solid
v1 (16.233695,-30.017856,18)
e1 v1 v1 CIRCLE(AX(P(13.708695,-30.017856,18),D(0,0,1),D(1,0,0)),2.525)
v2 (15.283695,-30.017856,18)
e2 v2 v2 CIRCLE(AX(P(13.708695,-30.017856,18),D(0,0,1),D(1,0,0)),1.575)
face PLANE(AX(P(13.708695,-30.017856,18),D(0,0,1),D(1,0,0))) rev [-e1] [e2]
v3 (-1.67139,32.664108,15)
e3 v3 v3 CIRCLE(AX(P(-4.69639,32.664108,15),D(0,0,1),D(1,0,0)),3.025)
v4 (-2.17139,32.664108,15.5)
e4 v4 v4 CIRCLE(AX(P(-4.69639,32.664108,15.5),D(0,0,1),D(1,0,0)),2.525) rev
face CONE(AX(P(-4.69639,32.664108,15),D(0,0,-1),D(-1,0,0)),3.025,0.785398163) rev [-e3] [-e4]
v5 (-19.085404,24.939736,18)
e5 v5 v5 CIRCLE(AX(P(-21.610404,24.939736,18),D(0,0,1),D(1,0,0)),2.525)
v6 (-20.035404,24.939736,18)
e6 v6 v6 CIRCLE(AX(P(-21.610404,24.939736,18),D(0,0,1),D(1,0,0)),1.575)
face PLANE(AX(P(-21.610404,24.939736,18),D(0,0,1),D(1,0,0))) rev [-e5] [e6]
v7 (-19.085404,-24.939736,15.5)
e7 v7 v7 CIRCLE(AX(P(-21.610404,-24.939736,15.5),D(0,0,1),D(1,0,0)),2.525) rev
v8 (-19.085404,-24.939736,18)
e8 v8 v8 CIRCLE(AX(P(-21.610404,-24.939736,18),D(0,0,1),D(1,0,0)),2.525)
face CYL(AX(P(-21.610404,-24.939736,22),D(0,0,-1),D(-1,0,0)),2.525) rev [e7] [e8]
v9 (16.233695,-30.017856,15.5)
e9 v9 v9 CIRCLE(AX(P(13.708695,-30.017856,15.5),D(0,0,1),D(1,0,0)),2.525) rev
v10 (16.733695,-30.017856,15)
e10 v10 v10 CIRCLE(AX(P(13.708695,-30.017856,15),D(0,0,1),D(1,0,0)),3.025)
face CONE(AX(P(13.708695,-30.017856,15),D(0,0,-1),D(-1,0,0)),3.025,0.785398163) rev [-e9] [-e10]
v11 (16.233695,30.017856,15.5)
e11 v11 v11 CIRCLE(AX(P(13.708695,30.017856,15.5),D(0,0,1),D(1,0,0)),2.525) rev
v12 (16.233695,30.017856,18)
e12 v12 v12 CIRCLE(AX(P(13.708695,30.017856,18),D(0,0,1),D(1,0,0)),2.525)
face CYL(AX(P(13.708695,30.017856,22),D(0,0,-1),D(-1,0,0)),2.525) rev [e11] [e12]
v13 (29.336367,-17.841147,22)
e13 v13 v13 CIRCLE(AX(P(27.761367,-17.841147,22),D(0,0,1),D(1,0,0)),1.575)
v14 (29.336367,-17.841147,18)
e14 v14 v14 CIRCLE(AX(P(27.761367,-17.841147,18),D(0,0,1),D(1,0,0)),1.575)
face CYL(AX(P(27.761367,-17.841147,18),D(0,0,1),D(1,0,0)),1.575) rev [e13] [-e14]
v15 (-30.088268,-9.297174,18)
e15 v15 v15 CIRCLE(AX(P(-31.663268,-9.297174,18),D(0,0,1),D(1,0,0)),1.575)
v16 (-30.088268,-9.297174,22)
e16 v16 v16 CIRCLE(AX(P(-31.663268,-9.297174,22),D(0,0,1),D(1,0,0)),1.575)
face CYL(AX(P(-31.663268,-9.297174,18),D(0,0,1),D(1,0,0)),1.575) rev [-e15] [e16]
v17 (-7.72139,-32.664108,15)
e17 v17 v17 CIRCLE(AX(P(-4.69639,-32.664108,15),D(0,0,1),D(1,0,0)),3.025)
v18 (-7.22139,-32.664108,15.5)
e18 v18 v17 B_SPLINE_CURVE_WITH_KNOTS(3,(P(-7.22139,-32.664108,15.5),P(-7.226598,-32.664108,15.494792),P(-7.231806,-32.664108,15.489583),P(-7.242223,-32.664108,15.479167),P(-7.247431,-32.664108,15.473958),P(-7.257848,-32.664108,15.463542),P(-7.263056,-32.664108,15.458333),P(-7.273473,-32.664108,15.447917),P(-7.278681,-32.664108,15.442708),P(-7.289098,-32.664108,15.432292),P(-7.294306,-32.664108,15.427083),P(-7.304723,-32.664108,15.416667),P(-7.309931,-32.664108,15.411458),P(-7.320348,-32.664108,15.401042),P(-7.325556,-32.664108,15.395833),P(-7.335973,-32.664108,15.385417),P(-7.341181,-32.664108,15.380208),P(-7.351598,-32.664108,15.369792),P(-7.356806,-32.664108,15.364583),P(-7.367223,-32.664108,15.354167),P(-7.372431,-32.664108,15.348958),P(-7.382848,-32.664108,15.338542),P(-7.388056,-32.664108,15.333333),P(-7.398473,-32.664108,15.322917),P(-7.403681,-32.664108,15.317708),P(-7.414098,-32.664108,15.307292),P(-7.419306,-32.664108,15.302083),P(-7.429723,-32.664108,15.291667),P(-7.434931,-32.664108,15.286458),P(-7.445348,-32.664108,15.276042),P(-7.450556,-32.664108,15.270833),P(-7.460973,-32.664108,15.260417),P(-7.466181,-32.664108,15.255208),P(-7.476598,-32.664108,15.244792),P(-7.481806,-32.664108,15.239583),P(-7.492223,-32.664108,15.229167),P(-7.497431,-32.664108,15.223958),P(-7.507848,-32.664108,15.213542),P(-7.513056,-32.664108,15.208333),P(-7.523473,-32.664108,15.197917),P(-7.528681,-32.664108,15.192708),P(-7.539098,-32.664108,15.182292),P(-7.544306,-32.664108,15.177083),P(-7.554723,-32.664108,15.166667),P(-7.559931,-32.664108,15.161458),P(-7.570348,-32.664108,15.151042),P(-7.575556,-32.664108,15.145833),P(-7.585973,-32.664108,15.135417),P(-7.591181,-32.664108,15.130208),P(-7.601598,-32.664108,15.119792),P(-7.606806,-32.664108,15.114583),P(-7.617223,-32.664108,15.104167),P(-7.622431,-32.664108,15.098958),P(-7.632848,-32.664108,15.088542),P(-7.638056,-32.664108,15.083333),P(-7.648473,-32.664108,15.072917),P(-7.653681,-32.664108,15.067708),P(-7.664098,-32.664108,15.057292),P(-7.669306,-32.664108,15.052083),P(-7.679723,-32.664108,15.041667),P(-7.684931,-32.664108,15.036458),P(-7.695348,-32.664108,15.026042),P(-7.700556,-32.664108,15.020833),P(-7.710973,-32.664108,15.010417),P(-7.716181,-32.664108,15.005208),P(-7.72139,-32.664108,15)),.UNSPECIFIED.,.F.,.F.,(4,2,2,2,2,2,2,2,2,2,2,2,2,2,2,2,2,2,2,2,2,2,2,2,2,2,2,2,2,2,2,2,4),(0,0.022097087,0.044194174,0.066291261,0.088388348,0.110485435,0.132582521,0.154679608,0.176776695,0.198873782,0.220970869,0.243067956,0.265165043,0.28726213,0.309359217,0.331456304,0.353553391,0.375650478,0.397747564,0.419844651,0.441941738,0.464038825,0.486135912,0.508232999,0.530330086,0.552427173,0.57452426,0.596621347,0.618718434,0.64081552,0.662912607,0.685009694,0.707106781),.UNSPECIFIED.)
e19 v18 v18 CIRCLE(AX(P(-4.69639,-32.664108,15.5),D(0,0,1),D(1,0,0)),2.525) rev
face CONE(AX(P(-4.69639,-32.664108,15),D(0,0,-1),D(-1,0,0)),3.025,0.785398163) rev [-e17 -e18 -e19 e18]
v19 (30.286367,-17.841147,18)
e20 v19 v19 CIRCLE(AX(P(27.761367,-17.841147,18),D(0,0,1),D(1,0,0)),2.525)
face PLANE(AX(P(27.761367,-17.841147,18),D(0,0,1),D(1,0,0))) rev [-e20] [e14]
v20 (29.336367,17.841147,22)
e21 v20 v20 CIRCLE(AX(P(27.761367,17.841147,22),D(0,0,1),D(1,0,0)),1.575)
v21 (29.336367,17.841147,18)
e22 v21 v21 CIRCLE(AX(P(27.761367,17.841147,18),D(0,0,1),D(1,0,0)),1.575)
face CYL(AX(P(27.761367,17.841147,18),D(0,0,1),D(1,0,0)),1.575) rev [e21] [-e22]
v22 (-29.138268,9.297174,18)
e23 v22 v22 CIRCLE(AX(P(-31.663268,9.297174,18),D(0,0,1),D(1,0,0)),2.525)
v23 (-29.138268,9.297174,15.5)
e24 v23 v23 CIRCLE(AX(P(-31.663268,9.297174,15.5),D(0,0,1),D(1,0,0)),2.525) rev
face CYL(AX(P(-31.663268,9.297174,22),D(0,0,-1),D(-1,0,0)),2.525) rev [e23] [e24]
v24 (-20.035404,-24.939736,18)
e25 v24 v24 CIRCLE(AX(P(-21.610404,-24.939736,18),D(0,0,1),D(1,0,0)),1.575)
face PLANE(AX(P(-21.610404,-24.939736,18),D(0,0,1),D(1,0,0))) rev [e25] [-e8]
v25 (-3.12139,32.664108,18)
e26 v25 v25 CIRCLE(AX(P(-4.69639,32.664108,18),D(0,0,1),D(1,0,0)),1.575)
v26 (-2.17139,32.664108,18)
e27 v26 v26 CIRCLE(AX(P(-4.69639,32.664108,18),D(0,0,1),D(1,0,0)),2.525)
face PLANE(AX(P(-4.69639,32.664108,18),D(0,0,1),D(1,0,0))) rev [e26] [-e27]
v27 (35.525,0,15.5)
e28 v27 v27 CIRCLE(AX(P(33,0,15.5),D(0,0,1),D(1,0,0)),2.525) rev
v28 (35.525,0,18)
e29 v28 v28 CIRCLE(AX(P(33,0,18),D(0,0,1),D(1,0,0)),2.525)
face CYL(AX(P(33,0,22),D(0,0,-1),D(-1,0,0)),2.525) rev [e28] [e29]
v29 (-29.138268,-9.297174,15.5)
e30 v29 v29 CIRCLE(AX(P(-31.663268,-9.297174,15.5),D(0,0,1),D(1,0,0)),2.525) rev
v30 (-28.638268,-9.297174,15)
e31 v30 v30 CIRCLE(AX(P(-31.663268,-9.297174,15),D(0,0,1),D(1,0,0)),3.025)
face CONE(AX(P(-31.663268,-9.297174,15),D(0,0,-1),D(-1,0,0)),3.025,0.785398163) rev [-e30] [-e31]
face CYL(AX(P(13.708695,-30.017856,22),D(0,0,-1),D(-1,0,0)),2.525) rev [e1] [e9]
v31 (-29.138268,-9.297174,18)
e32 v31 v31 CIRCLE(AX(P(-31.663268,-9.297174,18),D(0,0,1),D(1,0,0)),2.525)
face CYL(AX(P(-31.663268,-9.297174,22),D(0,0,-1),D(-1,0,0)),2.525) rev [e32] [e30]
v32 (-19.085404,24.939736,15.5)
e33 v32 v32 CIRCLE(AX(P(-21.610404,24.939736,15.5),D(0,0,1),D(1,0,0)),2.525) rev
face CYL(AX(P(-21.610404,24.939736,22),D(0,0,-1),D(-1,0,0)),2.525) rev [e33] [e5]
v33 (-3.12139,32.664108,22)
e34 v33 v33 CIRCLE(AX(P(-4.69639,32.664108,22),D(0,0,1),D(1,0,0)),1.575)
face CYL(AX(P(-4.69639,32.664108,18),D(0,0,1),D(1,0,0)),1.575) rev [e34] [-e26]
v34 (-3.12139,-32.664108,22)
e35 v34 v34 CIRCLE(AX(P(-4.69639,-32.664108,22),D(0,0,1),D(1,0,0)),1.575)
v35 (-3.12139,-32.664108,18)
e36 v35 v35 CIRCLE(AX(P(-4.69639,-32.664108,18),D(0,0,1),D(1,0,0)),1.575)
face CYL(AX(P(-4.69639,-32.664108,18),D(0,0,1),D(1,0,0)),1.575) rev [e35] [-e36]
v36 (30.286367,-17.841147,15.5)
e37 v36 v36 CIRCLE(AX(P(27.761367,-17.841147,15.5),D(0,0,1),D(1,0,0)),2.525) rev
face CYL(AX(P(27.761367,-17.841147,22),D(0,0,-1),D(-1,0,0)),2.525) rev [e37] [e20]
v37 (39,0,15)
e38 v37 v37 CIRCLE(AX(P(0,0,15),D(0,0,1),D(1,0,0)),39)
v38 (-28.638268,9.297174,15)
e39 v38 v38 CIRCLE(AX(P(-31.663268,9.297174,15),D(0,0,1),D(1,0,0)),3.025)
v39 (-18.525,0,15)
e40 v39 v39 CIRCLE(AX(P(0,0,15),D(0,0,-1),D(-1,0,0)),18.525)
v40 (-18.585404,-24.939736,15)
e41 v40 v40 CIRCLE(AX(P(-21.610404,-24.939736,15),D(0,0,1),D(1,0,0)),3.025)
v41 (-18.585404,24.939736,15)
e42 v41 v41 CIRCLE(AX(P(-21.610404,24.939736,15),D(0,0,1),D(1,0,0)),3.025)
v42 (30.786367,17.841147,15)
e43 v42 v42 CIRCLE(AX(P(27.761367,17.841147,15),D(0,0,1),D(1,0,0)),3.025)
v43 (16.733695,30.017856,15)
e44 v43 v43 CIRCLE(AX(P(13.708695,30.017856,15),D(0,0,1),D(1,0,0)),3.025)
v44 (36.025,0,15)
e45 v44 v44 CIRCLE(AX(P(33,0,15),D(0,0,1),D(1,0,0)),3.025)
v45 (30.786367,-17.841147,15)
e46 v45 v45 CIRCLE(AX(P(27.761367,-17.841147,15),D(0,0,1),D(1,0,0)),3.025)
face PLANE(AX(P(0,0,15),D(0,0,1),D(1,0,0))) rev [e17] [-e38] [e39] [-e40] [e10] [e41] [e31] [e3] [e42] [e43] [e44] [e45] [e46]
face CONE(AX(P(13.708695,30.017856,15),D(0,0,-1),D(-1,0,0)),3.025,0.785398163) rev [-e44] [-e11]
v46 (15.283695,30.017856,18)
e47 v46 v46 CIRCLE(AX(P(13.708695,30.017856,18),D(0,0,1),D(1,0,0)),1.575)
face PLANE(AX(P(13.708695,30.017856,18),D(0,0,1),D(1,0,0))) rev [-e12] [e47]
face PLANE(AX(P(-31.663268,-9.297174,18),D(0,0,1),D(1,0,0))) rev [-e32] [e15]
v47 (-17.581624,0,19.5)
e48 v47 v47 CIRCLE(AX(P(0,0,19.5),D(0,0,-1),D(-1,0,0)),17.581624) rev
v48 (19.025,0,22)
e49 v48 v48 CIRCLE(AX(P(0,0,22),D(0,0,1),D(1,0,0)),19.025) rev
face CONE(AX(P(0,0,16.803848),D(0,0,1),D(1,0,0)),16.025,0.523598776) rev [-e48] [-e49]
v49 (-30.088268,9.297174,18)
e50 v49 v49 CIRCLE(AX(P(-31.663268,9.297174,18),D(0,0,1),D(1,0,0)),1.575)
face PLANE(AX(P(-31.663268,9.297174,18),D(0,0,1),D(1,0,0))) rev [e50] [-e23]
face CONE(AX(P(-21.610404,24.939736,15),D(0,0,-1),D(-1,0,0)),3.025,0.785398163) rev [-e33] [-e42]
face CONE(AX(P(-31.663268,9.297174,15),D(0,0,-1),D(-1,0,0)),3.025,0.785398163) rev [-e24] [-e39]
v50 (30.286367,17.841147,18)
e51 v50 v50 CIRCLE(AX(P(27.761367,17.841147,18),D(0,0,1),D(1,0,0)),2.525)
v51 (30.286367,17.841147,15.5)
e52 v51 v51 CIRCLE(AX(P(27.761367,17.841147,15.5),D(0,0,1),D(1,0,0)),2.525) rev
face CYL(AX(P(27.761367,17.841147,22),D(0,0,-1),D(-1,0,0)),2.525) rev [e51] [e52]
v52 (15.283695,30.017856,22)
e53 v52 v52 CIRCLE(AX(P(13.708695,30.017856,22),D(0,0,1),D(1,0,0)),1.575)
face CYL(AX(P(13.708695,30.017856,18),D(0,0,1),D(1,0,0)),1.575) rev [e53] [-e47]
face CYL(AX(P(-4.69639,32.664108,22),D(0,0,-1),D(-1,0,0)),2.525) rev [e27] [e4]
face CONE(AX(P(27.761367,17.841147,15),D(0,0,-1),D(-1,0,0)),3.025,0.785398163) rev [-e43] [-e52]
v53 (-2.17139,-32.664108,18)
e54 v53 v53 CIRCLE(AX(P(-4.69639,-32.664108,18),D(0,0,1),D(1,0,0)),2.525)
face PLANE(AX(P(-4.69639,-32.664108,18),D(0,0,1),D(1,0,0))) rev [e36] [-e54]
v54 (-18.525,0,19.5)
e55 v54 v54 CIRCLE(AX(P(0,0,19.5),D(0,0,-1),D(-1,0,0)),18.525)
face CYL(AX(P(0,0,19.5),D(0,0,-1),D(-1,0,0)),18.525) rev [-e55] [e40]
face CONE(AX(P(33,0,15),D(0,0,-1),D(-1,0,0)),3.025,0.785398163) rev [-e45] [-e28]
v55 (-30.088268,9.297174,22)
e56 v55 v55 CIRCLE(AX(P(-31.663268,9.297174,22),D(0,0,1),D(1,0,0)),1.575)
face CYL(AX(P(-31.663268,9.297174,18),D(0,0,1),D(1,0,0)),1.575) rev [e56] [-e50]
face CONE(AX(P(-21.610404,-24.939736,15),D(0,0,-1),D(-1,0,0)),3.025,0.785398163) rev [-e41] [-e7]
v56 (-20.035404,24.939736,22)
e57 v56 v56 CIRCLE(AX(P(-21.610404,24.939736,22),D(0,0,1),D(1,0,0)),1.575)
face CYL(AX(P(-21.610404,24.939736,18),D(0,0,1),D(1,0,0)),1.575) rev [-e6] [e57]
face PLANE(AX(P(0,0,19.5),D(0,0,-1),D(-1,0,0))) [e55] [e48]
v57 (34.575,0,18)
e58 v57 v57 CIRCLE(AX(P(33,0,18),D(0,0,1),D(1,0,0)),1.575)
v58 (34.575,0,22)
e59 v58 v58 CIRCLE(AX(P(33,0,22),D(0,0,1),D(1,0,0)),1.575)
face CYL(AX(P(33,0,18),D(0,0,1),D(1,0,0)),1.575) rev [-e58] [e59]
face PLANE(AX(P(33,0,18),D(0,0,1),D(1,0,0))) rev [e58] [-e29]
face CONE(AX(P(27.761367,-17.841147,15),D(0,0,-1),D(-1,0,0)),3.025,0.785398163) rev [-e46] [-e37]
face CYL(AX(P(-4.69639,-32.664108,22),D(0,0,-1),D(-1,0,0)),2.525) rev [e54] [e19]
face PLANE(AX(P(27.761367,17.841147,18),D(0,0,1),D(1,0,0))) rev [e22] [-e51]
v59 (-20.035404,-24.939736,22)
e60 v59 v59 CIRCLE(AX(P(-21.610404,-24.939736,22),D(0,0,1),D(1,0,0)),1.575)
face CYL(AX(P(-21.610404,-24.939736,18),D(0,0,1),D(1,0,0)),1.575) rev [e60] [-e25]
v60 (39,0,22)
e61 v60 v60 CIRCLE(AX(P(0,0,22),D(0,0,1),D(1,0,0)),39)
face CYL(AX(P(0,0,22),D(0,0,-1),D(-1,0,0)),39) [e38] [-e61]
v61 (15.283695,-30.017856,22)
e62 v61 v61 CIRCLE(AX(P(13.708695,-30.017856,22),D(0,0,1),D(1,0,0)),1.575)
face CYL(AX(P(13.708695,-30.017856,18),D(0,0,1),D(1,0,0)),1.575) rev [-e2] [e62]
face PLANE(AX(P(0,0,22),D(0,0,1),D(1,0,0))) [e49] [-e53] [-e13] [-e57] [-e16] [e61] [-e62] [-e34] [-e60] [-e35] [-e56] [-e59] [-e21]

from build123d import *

# Parameters (mm, degrees)
SKETCH1_R           = 39
SKETCH1_R_2         = 2.525
SKETCH1_R_3         = 16.025
BOSS_EXTRUDE1_DEPTH = 7
SKETCH2_R           = 18.525
CUT_EXTRUDE1_DEPTH  = 4.5
SKETCH3_R           = 2.55
SKETCH3_R_2         = 1.575
BOSS_EXTRUDE2_DEPTH = 4
CHAMFER1_SIZE       = 3
CHAMFER1_SIZE_2     = 5.196152423
CHAMFER3_SIZE       = 0.5


with BuildPart() as part:
    # Sketch1 → Boss-Extrude1 (new body)
    with BuildSketch(Plane.XY.offset(15)):
        Circle(SKETCH1_R)
        with Locations((33, 0)):
            Circle(SKETCH1_R_2, mode=Mode.SUBTRACT)
        with Locations((27.761366583, -17.841146976)):
            Circle(SKETCH1_R_2, mode=Mode.SUBTRACT)
        with Locations((13.708695429, -30.017855847)):
            Circle(SKETCH1_R_2, mode=Mode.SUBTRACT)
        with Locations((-4.696389663, -32.664107582)):
            Circle(SKETCH1_R_2, mode=Mode.SUBTRACT)
        with Locations((-21.61040422, -24.939735954)):
            Circle(SKETCH1_R_2, mode=Mode.SUBTRACT)
        with Locations((-31.663268129, -9.297174376)):
            Circle(SKETCH1_R_2, mode=Mode.SUBTRACT)
        with Locations((-31.663268129, 9.297174376)):
            Circle(SKETCH1_R_2, mode=Mode.SUBTRACT)
        with Locations((-21.61040422, 24.939735954)):
            Circle(SKETCH1_R_2, mode=Mode.SUBTRACT)
        with Locations((-4.696389663, 32.664107582)):
            Circle(SKETCH1_R_2, mode=Mode.SUBTRACT)
        with Locations((13.708695429, 30.017855847)):
            Circle(SKETCH1_R_2, mode=Mode.SUBTRACT)
        with Locations((27.761366583, 17.841146976)):
            Circle(SKETCH1_R_2, mode=Mode.SUBTRACT)
        Circle(SKETCH1_R_3, mode=Mode.SUBTRACT)
    extrude(amount=BOSS_EXTRUDE1_DEPTH)

    # Sketch2 → Cut-Extrude1 (cut)
    with BuildSketch(Plane(origin=(0, 0, 15), x_dir=(-1, 0, 0), z_dir=(0, 0, -1))):
        Circle(SKETCH2_R)
    extrude(amount=-CUT_EXTRUDE1_DEPTH, mode=Mode.SUBTRACT)

    # Sketch3 → Boss-Extrude2 (add)
    # profile 1 of 11: a face of its own
    with BuildSketch(Plane.XY.offset(22)):
        with Locations((-4.696389663, 32.664107582)):
            Circle(SKETCH3_R)
        with Locations((-4.696389663, 32.664107582)):
            Circle(SKETCH3_R_2, mode=Mode.SUBTRACT)
    # profile 2 of 11: a face of its own
    with BuildSketch(Plane.XY.offset(22)):
        with Locations((13.708695429, 30.017855847)):
            Circle(SKETCH3_R)
        with Locations((13.708695429, 30.017855847)):
            Circle(SKETCH3_R_2, mode=Mode.SUBTRACT)
    # profile 3 of 11: a face of its own
    with BuildSketch(Plane.XY.offset(22)):
        with Locations((27.761366583, 17.841146976)):
            Circle(SKETCH3_R)
        with Locations((27.761366583, 17.841146976)):
            Circle(SKETCH3_R_2, mode=Mode.SUBTRACT)
    # profile 4 of 11: a face of its own
    with BuildSketch(Plane.XY.offset(22)):
        with Locations((33, 0)):
            Circle(SKETCH3_R)
        with Locations((33, 0)):
            Circle(SKETCH3_R_2, mode=Mode.SUBTRACT)
    # profile 5 of 11: a face of its own
    with BuildSketch(Plane.XY.offset(22)):
        with Locations((27.761366583, -17.841146976)):
            Circle(SKETCH3_R)
        with Locations((27.761366583, -17.841146976)):
            Circle(SKETCH3_R_2, mode=Mode.SUBTRACT)
    # profile 6 of 11: a face of its own
    with BuildSketch(Plane.XY.offset(22)):
        with Locations((13.708695429, -30.017855847)):
            Circle(SKETCH3_R)
        with Locations((13.708695429, -30.017855847)):
            Circle(SKETCH3_R_2, mode=Mode.SUBTRACT)
    # profile 7 of 11: a face of its own
    with BuildSketch(Plane.XY.offset(22)):
        with Locations((-4.696389663, -32.664107582)):
            Circle(SKETCH3_R)
        with Locations((-4.696389663, -32.664107582)):
            Circle(SKETCH3_R_2, mode=Mode.SUBTRACT)
    # profile 8 of 11: a face of its own
    with BuildSketch(Plane.XY.offset(22)):
        with Locations((-21.61040422, -24.939735954)):
            Circle(SKETCH3_R)
        with Locations((-21.61040422, -24.939735954)):
            Circle(SKETCH3_R_2, mode=Mode.SUBTRACT)
    # profile 9 of 11: a face of its own
    with BuildSketch(Plane.XY.offset(22)):
        with Locations((-31.663268129, -9.297174376)):
            Circle(SKETCH3_R)
        with Locations((-31.663268129, -9.297174376)):
            Circle(SKETCH3_R_2, mode=Mode.SUBTRACT)
    # profile 10 of 11: a face of its own
    with BuildSketch(Plane.XY.offset(22)):
        with Locations((-31.663268129, 9.297174376)):
            Circle(SKETCH3_R)
        with Locations((-31.663268129, 9.297174376)):
            Circle(SKETCH3_R_2, mode=Mode.SUBTRACT)
    # profile 11 of 11: a face of its own
    with BuildSketch(Plane.XY.offset(22)):
        with Locations((-21.61040422, 24.939735954)):
            Circle(SKETCH3_R)
        with Locations((-21.61040422, 24.939735954)):
            Circle(SKETCH3_R_2, mode=Mode.SUBTRACT)
    extrude(amount=-BOSS_EXTRUDE2_DEPTH)

    # Chamfer1
    # the kernel refuses this chamfer: 5.196152423, 3 mm, written as the material it takes off along each edge
    with BuildSketch(Plane(origin=(0, 0, 22), x_dir=(1, 0, 0), z_dir=(0, -1, 0))) as chamfer1_piece_1:
        Polygon((16.025 + CHAMFER1_SIZE, 0), (16.025, -CHAMFER1_SIZE_2), (16.025, 0), align=None)
    revolve(axis=Axis((0, 0, 22), (0, 0, 1)), mode=Mode.SUBTRACT)

    # Chamfer3
    chamfer3_edges = [part.edges().sort_by_distance(p)[0] for p in [
        (11.183695429, -30.017855847, 15),
        (-7.221389663, -32.664107582, 15),
        (-24.13540422, -24.939735954, 15),
        (-34.188268129, -9.297174376, 15),
        (-34.188268129, 9.297174376, 15),
        (-24.13540422, 24.939735954, 15),
        (-7.221389663, 32.664107582, 15),
        (11.183695429, 30.017855847, 15),
        (25.236366583, 17.841146976, 15),
        (30.475, 0, 15),
        (25.236366583, -17.841146976, 15),
    ]]
    chamfer(chamfer3_edges, length=CHAMFER3_SIZE)


solid = part.part
